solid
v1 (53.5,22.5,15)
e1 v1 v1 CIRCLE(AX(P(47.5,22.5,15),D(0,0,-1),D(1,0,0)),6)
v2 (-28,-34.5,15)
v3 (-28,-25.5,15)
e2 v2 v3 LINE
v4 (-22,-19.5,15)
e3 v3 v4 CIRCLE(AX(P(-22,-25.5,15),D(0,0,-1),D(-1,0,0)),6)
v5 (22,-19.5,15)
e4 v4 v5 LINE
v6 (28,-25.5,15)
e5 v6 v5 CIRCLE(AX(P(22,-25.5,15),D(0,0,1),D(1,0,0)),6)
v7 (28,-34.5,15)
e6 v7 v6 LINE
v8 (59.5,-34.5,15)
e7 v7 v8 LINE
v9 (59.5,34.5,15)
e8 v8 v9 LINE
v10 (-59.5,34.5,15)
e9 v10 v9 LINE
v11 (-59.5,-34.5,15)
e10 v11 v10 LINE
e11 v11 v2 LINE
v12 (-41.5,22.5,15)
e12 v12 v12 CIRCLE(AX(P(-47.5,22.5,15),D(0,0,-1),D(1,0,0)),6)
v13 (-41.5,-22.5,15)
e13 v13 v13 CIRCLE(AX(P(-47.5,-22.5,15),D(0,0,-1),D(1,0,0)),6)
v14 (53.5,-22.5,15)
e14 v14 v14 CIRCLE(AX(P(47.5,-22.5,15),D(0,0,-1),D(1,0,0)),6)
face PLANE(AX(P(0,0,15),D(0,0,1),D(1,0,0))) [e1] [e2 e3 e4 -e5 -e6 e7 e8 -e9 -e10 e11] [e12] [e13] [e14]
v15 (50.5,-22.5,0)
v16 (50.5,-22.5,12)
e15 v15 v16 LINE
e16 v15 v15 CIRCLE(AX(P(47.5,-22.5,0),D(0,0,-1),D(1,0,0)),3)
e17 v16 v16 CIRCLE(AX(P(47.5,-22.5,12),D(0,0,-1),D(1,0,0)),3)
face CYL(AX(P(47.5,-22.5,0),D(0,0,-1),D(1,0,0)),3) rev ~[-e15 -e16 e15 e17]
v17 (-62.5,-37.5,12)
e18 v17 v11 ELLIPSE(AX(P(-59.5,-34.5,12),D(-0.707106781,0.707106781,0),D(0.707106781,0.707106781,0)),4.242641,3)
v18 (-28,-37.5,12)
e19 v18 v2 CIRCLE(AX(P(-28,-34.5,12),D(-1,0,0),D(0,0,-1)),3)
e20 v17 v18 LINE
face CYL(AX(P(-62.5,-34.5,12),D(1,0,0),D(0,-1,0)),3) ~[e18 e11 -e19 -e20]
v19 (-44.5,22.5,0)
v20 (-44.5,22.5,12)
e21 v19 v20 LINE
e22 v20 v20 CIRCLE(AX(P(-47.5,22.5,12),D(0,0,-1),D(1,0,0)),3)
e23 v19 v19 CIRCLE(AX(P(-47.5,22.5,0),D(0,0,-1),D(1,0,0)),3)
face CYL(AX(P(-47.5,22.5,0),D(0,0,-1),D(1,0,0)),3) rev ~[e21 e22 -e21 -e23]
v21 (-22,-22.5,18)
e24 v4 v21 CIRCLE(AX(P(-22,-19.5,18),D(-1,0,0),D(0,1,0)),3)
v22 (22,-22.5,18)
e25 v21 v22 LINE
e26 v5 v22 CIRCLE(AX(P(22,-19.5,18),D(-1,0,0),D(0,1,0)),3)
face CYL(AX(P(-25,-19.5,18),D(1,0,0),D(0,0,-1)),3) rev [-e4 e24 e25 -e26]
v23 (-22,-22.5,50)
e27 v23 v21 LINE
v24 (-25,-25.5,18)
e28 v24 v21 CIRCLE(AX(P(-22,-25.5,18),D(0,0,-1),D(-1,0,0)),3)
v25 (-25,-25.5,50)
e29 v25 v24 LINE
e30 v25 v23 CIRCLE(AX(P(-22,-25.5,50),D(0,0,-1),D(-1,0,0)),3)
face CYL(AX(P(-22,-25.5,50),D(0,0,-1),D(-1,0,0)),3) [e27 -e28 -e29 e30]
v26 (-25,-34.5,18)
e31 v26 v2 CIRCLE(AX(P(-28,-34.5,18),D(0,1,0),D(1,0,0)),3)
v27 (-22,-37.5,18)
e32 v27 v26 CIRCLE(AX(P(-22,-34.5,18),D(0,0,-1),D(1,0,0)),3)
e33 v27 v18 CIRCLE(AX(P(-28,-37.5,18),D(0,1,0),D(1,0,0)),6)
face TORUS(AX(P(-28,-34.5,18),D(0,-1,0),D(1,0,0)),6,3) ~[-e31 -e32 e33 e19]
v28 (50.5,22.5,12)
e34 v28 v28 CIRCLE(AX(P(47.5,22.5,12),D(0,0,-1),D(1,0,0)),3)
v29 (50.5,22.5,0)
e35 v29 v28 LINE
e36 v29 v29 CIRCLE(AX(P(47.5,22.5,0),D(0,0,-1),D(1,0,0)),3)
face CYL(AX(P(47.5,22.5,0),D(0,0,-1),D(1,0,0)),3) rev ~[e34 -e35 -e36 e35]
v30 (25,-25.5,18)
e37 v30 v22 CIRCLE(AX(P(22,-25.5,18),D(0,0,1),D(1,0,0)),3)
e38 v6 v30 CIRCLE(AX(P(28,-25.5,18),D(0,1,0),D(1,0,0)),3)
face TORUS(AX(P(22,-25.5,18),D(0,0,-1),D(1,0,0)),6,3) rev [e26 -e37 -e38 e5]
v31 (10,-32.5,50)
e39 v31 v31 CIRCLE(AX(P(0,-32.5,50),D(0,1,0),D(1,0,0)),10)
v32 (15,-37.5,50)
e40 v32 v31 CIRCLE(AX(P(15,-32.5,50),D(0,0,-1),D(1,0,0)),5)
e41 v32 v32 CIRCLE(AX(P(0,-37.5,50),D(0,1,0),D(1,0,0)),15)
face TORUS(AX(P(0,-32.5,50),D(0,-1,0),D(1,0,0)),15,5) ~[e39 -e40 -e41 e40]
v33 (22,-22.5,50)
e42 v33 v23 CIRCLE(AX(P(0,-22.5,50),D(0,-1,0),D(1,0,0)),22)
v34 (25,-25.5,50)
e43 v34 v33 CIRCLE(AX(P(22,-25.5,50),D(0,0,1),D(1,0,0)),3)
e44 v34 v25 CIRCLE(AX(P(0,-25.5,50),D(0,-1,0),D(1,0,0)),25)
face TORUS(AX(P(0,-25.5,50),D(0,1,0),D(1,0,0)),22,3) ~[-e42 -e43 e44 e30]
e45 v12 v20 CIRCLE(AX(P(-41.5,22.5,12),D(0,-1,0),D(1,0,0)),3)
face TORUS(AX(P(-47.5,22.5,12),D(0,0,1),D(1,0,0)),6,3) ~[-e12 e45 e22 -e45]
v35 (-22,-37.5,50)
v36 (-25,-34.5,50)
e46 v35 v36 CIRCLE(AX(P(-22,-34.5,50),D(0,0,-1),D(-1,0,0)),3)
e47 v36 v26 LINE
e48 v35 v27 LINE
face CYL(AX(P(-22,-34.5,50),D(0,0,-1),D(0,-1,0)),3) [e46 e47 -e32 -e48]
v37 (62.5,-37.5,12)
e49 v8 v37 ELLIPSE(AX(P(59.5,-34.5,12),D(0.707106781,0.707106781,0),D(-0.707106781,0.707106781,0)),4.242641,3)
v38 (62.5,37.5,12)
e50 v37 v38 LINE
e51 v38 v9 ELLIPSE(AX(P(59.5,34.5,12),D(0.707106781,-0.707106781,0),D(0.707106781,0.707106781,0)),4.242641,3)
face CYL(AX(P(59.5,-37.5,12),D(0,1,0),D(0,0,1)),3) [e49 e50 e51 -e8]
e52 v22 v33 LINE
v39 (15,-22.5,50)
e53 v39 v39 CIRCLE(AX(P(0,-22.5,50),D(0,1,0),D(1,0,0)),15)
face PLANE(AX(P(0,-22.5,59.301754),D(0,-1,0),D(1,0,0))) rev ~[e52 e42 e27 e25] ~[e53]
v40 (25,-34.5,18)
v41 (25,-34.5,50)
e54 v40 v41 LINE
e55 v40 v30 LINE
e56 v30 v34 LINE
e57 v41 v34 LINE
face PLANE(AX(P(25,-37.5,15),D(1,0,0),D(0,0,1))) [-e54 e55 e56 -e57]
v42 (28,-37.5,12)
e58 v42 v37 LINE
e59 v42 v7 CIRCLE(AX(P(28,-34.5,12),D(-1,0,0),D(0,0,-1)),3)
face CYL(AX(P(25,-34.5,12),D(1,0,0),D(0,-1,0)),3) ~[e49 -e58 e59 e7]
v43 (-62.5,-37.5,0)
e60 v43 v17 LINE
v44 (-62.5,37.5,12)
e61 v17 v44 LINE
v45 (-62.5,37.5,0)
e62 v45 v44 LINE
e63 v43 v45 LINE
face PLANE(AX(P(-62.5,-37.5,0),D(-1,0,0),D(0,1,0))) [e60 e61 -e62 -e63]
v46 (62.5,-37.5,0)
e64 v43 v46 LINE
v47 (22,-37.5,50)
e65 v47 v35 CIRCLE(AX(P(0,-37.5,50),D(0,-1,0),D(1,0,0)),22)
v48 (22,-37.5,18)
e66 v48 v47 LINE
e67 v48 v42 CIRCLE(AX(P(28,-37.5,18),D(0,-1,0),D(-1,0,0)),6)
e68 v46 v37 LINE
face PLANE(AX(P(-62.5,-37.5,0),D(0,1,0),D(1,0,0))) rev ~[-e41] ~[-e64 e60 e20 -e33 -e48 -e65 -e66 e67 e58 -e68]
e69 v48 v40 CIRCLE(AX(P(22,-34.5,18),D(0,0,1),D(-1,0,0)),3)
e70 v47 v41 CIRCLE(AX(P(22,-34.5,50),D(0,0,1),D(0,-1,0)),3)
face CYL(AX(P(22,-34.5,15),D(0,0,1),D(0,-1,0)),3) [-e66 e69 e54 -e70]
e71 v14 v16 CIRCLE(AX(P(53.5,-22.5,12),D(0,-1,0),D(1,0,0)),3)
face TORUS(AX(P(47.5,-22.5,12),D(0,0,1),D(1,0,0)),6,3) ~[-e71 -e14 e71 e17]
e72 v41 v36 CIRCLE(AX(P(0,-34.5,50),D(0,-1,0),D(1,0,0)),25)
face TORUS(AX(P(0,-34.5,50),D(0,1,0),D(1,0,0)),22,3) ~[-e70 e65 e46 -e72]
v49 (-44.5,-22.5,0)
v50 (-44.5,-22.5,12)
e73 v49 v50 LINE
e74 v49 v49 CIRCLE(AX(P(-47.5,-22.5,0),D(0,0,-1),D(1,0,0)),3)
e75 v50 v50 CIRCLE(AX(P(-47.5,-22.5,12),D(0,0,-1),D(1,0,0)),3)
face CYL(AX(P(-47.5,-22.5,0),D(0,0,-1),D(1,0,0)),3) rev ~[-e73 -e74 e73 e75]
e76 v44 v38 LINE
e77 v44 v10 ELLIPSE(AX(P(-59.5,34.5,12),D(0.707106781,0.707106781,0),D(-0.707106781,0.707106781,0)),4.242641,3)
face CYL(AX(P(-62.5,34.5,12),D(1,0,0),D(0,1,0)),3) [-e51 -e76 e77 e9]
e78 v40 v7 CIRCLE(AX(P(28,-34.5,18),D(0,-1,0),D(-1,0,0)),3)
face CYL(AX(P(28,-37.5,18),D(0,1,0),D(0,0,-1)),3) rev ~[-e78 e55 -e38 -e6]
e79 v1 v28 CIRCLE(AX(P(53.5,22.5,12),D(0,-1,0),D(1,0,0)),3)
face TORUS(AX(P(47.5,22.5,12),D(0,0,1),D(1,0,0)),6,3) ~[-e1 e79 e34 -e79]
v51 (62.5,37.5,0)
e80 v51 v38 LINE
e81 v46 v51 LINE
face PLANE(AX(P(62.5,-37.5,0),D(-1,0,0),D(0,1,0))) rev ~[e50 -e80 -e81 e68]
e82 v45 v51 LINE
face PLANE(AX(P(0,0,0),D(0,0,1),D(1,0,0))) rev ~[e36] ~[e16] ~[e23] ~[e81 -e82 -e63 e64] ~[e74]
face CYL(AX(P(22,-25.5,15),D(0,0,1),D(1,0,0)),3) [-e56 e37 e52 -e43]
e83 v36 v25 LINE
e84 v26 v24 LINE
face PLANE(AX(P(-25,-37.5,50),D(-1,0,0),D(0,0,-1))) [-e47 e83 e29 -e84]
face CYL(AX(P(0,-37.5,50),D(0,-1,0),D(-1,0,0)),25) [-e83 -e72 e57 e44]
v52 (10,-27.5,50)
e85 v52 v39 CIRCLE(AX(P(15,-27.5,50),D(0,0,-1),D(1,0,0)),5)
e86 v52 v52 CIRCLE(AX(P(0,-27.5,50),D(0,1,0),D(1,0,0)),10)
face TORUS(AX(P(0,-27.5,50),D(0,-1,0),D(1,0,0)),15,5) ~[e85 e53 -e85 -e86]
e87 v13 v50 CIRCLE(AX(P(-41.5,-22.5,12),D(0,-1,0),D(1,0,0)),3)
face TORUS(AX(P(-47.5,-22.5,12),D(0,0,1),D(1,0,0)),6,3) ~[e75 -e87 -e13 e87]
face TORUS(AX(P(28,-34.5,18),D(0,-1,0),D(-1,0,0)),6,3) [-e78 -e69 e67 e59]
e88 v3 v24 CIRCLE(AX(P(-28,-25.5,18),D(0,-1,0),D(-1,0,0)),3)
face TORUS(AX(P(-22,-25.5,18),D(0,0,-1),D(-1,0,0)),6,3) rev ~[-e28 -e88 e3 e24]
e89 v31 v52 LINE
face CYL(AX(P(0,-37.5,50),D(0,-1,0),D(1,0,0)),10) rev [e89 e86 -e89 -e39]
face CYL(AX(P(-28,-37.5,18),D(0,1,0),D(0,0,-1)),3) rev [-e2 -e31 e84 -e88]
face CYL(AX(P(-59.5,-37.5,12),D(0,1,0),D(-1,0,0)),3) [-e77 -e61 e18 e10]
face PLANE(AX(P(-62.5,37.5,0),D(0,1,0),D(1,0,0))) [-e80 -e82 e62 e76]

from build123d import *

# Parameters (mm, degrees)
F0_W     = 125
F0_H     = 75
F1_DEPTH = 15
F3_DEPTH = 15
F4_R     = 3
F5_DEPTH = 75.001
F6_R     = 3
F7_R     = 5


with BuildPart() as f1:
    # F0 (on Top) → F1 (new body)
    with BuildSketch(Plane.XY):
        Rectangle(F0_W, F0_H)
    extrude(amount=F1_DEPTH)

    # F2 (on face) → F3 (join)
    with BuildSketch(Plane.XZ.offset(37.5)):
        with BuildLine():
            Line((10, 50), (25, 50))
            ThreePointArc((25, 50), (0, 75), (-25, 50))
            Line((-25, 50), (-10, 50))
            ThreePointArc((-10, 50), (0, 60), (10, 50))
        make_face()
        with BuildLine():
            ThreePointArc((-25, 50), (0, 25), (25, 50))
            Line((25, 50), (10, 50))
            ThreePointArc((10, 50), (0, 40), (-10, 50))
            Line((-10, 50), (-25, 50))
        make_face()
        with BuildLine():
            Line((25, 15), (25, 50))
            ThreePointArc((25, 50), (0, 25), (-25, 50))
            Line((-25, 50), (-25, 15))
            Line((-25, 15), (25, 15))
        make_face()
    extrude(amount=-F3_DEPTH)

    # F4 (on face) → F5 (cut, through all)
    with BuildSketch(Plane(origin=(0, 0, 0), x_dir=(1, 0, 0), z_dir=(0, 0, -1))):
        with Locations((-47.5, 22.5)):
            Circle(F4_R)
        with Locations((47.5, 22.5)):
            Circle(F4_R)
        with Locations((47.5, -22.5)):
            Circle(F4_R)
        with Locations((-47.5, -22.5)):
            Circle(F4_R)
    extrude(amount=-F5_DEPTH, mode=Mode.SUBTRACT)

    # F6
    f6_edges = [f1.edges().sort_by_distance(p)[0] for p in [
        (0, -37.5, 75),
        (0, -22.5, 75),
        (25, -22.5, 32.5),
        (25, -37.5, 32.5),
        (-25, -37.5, 32.5),
        (-43.75, -37.5, 15),
        (-62.5, 0, 15),
        (0, 37.5, 15),
        (62.5, 0, 15),
        (43.75, -37.5, 15),
        (25, -30, 15),
        (-25, -30, 15),
        (-50.5, 22.5, 15),
        (-50.5, -22.5, 15),
        (44.5, -22.5, 15),
        (44.5, 22.5, 15),
        (0, -22.5, 15),
        (-25, -22.5, 32.5),
    ]]
    fillet(f6_edges, radius=F6_R)

    # F7
    f7_edges = [f1.edges().sort_by_distance(p)[0] for p in [
        (-10, -37.5, 50),
        (-10, -22.5, 50),
    ]]
    fillet(f7_edges, radius=F7_R)


solid = f1.part
